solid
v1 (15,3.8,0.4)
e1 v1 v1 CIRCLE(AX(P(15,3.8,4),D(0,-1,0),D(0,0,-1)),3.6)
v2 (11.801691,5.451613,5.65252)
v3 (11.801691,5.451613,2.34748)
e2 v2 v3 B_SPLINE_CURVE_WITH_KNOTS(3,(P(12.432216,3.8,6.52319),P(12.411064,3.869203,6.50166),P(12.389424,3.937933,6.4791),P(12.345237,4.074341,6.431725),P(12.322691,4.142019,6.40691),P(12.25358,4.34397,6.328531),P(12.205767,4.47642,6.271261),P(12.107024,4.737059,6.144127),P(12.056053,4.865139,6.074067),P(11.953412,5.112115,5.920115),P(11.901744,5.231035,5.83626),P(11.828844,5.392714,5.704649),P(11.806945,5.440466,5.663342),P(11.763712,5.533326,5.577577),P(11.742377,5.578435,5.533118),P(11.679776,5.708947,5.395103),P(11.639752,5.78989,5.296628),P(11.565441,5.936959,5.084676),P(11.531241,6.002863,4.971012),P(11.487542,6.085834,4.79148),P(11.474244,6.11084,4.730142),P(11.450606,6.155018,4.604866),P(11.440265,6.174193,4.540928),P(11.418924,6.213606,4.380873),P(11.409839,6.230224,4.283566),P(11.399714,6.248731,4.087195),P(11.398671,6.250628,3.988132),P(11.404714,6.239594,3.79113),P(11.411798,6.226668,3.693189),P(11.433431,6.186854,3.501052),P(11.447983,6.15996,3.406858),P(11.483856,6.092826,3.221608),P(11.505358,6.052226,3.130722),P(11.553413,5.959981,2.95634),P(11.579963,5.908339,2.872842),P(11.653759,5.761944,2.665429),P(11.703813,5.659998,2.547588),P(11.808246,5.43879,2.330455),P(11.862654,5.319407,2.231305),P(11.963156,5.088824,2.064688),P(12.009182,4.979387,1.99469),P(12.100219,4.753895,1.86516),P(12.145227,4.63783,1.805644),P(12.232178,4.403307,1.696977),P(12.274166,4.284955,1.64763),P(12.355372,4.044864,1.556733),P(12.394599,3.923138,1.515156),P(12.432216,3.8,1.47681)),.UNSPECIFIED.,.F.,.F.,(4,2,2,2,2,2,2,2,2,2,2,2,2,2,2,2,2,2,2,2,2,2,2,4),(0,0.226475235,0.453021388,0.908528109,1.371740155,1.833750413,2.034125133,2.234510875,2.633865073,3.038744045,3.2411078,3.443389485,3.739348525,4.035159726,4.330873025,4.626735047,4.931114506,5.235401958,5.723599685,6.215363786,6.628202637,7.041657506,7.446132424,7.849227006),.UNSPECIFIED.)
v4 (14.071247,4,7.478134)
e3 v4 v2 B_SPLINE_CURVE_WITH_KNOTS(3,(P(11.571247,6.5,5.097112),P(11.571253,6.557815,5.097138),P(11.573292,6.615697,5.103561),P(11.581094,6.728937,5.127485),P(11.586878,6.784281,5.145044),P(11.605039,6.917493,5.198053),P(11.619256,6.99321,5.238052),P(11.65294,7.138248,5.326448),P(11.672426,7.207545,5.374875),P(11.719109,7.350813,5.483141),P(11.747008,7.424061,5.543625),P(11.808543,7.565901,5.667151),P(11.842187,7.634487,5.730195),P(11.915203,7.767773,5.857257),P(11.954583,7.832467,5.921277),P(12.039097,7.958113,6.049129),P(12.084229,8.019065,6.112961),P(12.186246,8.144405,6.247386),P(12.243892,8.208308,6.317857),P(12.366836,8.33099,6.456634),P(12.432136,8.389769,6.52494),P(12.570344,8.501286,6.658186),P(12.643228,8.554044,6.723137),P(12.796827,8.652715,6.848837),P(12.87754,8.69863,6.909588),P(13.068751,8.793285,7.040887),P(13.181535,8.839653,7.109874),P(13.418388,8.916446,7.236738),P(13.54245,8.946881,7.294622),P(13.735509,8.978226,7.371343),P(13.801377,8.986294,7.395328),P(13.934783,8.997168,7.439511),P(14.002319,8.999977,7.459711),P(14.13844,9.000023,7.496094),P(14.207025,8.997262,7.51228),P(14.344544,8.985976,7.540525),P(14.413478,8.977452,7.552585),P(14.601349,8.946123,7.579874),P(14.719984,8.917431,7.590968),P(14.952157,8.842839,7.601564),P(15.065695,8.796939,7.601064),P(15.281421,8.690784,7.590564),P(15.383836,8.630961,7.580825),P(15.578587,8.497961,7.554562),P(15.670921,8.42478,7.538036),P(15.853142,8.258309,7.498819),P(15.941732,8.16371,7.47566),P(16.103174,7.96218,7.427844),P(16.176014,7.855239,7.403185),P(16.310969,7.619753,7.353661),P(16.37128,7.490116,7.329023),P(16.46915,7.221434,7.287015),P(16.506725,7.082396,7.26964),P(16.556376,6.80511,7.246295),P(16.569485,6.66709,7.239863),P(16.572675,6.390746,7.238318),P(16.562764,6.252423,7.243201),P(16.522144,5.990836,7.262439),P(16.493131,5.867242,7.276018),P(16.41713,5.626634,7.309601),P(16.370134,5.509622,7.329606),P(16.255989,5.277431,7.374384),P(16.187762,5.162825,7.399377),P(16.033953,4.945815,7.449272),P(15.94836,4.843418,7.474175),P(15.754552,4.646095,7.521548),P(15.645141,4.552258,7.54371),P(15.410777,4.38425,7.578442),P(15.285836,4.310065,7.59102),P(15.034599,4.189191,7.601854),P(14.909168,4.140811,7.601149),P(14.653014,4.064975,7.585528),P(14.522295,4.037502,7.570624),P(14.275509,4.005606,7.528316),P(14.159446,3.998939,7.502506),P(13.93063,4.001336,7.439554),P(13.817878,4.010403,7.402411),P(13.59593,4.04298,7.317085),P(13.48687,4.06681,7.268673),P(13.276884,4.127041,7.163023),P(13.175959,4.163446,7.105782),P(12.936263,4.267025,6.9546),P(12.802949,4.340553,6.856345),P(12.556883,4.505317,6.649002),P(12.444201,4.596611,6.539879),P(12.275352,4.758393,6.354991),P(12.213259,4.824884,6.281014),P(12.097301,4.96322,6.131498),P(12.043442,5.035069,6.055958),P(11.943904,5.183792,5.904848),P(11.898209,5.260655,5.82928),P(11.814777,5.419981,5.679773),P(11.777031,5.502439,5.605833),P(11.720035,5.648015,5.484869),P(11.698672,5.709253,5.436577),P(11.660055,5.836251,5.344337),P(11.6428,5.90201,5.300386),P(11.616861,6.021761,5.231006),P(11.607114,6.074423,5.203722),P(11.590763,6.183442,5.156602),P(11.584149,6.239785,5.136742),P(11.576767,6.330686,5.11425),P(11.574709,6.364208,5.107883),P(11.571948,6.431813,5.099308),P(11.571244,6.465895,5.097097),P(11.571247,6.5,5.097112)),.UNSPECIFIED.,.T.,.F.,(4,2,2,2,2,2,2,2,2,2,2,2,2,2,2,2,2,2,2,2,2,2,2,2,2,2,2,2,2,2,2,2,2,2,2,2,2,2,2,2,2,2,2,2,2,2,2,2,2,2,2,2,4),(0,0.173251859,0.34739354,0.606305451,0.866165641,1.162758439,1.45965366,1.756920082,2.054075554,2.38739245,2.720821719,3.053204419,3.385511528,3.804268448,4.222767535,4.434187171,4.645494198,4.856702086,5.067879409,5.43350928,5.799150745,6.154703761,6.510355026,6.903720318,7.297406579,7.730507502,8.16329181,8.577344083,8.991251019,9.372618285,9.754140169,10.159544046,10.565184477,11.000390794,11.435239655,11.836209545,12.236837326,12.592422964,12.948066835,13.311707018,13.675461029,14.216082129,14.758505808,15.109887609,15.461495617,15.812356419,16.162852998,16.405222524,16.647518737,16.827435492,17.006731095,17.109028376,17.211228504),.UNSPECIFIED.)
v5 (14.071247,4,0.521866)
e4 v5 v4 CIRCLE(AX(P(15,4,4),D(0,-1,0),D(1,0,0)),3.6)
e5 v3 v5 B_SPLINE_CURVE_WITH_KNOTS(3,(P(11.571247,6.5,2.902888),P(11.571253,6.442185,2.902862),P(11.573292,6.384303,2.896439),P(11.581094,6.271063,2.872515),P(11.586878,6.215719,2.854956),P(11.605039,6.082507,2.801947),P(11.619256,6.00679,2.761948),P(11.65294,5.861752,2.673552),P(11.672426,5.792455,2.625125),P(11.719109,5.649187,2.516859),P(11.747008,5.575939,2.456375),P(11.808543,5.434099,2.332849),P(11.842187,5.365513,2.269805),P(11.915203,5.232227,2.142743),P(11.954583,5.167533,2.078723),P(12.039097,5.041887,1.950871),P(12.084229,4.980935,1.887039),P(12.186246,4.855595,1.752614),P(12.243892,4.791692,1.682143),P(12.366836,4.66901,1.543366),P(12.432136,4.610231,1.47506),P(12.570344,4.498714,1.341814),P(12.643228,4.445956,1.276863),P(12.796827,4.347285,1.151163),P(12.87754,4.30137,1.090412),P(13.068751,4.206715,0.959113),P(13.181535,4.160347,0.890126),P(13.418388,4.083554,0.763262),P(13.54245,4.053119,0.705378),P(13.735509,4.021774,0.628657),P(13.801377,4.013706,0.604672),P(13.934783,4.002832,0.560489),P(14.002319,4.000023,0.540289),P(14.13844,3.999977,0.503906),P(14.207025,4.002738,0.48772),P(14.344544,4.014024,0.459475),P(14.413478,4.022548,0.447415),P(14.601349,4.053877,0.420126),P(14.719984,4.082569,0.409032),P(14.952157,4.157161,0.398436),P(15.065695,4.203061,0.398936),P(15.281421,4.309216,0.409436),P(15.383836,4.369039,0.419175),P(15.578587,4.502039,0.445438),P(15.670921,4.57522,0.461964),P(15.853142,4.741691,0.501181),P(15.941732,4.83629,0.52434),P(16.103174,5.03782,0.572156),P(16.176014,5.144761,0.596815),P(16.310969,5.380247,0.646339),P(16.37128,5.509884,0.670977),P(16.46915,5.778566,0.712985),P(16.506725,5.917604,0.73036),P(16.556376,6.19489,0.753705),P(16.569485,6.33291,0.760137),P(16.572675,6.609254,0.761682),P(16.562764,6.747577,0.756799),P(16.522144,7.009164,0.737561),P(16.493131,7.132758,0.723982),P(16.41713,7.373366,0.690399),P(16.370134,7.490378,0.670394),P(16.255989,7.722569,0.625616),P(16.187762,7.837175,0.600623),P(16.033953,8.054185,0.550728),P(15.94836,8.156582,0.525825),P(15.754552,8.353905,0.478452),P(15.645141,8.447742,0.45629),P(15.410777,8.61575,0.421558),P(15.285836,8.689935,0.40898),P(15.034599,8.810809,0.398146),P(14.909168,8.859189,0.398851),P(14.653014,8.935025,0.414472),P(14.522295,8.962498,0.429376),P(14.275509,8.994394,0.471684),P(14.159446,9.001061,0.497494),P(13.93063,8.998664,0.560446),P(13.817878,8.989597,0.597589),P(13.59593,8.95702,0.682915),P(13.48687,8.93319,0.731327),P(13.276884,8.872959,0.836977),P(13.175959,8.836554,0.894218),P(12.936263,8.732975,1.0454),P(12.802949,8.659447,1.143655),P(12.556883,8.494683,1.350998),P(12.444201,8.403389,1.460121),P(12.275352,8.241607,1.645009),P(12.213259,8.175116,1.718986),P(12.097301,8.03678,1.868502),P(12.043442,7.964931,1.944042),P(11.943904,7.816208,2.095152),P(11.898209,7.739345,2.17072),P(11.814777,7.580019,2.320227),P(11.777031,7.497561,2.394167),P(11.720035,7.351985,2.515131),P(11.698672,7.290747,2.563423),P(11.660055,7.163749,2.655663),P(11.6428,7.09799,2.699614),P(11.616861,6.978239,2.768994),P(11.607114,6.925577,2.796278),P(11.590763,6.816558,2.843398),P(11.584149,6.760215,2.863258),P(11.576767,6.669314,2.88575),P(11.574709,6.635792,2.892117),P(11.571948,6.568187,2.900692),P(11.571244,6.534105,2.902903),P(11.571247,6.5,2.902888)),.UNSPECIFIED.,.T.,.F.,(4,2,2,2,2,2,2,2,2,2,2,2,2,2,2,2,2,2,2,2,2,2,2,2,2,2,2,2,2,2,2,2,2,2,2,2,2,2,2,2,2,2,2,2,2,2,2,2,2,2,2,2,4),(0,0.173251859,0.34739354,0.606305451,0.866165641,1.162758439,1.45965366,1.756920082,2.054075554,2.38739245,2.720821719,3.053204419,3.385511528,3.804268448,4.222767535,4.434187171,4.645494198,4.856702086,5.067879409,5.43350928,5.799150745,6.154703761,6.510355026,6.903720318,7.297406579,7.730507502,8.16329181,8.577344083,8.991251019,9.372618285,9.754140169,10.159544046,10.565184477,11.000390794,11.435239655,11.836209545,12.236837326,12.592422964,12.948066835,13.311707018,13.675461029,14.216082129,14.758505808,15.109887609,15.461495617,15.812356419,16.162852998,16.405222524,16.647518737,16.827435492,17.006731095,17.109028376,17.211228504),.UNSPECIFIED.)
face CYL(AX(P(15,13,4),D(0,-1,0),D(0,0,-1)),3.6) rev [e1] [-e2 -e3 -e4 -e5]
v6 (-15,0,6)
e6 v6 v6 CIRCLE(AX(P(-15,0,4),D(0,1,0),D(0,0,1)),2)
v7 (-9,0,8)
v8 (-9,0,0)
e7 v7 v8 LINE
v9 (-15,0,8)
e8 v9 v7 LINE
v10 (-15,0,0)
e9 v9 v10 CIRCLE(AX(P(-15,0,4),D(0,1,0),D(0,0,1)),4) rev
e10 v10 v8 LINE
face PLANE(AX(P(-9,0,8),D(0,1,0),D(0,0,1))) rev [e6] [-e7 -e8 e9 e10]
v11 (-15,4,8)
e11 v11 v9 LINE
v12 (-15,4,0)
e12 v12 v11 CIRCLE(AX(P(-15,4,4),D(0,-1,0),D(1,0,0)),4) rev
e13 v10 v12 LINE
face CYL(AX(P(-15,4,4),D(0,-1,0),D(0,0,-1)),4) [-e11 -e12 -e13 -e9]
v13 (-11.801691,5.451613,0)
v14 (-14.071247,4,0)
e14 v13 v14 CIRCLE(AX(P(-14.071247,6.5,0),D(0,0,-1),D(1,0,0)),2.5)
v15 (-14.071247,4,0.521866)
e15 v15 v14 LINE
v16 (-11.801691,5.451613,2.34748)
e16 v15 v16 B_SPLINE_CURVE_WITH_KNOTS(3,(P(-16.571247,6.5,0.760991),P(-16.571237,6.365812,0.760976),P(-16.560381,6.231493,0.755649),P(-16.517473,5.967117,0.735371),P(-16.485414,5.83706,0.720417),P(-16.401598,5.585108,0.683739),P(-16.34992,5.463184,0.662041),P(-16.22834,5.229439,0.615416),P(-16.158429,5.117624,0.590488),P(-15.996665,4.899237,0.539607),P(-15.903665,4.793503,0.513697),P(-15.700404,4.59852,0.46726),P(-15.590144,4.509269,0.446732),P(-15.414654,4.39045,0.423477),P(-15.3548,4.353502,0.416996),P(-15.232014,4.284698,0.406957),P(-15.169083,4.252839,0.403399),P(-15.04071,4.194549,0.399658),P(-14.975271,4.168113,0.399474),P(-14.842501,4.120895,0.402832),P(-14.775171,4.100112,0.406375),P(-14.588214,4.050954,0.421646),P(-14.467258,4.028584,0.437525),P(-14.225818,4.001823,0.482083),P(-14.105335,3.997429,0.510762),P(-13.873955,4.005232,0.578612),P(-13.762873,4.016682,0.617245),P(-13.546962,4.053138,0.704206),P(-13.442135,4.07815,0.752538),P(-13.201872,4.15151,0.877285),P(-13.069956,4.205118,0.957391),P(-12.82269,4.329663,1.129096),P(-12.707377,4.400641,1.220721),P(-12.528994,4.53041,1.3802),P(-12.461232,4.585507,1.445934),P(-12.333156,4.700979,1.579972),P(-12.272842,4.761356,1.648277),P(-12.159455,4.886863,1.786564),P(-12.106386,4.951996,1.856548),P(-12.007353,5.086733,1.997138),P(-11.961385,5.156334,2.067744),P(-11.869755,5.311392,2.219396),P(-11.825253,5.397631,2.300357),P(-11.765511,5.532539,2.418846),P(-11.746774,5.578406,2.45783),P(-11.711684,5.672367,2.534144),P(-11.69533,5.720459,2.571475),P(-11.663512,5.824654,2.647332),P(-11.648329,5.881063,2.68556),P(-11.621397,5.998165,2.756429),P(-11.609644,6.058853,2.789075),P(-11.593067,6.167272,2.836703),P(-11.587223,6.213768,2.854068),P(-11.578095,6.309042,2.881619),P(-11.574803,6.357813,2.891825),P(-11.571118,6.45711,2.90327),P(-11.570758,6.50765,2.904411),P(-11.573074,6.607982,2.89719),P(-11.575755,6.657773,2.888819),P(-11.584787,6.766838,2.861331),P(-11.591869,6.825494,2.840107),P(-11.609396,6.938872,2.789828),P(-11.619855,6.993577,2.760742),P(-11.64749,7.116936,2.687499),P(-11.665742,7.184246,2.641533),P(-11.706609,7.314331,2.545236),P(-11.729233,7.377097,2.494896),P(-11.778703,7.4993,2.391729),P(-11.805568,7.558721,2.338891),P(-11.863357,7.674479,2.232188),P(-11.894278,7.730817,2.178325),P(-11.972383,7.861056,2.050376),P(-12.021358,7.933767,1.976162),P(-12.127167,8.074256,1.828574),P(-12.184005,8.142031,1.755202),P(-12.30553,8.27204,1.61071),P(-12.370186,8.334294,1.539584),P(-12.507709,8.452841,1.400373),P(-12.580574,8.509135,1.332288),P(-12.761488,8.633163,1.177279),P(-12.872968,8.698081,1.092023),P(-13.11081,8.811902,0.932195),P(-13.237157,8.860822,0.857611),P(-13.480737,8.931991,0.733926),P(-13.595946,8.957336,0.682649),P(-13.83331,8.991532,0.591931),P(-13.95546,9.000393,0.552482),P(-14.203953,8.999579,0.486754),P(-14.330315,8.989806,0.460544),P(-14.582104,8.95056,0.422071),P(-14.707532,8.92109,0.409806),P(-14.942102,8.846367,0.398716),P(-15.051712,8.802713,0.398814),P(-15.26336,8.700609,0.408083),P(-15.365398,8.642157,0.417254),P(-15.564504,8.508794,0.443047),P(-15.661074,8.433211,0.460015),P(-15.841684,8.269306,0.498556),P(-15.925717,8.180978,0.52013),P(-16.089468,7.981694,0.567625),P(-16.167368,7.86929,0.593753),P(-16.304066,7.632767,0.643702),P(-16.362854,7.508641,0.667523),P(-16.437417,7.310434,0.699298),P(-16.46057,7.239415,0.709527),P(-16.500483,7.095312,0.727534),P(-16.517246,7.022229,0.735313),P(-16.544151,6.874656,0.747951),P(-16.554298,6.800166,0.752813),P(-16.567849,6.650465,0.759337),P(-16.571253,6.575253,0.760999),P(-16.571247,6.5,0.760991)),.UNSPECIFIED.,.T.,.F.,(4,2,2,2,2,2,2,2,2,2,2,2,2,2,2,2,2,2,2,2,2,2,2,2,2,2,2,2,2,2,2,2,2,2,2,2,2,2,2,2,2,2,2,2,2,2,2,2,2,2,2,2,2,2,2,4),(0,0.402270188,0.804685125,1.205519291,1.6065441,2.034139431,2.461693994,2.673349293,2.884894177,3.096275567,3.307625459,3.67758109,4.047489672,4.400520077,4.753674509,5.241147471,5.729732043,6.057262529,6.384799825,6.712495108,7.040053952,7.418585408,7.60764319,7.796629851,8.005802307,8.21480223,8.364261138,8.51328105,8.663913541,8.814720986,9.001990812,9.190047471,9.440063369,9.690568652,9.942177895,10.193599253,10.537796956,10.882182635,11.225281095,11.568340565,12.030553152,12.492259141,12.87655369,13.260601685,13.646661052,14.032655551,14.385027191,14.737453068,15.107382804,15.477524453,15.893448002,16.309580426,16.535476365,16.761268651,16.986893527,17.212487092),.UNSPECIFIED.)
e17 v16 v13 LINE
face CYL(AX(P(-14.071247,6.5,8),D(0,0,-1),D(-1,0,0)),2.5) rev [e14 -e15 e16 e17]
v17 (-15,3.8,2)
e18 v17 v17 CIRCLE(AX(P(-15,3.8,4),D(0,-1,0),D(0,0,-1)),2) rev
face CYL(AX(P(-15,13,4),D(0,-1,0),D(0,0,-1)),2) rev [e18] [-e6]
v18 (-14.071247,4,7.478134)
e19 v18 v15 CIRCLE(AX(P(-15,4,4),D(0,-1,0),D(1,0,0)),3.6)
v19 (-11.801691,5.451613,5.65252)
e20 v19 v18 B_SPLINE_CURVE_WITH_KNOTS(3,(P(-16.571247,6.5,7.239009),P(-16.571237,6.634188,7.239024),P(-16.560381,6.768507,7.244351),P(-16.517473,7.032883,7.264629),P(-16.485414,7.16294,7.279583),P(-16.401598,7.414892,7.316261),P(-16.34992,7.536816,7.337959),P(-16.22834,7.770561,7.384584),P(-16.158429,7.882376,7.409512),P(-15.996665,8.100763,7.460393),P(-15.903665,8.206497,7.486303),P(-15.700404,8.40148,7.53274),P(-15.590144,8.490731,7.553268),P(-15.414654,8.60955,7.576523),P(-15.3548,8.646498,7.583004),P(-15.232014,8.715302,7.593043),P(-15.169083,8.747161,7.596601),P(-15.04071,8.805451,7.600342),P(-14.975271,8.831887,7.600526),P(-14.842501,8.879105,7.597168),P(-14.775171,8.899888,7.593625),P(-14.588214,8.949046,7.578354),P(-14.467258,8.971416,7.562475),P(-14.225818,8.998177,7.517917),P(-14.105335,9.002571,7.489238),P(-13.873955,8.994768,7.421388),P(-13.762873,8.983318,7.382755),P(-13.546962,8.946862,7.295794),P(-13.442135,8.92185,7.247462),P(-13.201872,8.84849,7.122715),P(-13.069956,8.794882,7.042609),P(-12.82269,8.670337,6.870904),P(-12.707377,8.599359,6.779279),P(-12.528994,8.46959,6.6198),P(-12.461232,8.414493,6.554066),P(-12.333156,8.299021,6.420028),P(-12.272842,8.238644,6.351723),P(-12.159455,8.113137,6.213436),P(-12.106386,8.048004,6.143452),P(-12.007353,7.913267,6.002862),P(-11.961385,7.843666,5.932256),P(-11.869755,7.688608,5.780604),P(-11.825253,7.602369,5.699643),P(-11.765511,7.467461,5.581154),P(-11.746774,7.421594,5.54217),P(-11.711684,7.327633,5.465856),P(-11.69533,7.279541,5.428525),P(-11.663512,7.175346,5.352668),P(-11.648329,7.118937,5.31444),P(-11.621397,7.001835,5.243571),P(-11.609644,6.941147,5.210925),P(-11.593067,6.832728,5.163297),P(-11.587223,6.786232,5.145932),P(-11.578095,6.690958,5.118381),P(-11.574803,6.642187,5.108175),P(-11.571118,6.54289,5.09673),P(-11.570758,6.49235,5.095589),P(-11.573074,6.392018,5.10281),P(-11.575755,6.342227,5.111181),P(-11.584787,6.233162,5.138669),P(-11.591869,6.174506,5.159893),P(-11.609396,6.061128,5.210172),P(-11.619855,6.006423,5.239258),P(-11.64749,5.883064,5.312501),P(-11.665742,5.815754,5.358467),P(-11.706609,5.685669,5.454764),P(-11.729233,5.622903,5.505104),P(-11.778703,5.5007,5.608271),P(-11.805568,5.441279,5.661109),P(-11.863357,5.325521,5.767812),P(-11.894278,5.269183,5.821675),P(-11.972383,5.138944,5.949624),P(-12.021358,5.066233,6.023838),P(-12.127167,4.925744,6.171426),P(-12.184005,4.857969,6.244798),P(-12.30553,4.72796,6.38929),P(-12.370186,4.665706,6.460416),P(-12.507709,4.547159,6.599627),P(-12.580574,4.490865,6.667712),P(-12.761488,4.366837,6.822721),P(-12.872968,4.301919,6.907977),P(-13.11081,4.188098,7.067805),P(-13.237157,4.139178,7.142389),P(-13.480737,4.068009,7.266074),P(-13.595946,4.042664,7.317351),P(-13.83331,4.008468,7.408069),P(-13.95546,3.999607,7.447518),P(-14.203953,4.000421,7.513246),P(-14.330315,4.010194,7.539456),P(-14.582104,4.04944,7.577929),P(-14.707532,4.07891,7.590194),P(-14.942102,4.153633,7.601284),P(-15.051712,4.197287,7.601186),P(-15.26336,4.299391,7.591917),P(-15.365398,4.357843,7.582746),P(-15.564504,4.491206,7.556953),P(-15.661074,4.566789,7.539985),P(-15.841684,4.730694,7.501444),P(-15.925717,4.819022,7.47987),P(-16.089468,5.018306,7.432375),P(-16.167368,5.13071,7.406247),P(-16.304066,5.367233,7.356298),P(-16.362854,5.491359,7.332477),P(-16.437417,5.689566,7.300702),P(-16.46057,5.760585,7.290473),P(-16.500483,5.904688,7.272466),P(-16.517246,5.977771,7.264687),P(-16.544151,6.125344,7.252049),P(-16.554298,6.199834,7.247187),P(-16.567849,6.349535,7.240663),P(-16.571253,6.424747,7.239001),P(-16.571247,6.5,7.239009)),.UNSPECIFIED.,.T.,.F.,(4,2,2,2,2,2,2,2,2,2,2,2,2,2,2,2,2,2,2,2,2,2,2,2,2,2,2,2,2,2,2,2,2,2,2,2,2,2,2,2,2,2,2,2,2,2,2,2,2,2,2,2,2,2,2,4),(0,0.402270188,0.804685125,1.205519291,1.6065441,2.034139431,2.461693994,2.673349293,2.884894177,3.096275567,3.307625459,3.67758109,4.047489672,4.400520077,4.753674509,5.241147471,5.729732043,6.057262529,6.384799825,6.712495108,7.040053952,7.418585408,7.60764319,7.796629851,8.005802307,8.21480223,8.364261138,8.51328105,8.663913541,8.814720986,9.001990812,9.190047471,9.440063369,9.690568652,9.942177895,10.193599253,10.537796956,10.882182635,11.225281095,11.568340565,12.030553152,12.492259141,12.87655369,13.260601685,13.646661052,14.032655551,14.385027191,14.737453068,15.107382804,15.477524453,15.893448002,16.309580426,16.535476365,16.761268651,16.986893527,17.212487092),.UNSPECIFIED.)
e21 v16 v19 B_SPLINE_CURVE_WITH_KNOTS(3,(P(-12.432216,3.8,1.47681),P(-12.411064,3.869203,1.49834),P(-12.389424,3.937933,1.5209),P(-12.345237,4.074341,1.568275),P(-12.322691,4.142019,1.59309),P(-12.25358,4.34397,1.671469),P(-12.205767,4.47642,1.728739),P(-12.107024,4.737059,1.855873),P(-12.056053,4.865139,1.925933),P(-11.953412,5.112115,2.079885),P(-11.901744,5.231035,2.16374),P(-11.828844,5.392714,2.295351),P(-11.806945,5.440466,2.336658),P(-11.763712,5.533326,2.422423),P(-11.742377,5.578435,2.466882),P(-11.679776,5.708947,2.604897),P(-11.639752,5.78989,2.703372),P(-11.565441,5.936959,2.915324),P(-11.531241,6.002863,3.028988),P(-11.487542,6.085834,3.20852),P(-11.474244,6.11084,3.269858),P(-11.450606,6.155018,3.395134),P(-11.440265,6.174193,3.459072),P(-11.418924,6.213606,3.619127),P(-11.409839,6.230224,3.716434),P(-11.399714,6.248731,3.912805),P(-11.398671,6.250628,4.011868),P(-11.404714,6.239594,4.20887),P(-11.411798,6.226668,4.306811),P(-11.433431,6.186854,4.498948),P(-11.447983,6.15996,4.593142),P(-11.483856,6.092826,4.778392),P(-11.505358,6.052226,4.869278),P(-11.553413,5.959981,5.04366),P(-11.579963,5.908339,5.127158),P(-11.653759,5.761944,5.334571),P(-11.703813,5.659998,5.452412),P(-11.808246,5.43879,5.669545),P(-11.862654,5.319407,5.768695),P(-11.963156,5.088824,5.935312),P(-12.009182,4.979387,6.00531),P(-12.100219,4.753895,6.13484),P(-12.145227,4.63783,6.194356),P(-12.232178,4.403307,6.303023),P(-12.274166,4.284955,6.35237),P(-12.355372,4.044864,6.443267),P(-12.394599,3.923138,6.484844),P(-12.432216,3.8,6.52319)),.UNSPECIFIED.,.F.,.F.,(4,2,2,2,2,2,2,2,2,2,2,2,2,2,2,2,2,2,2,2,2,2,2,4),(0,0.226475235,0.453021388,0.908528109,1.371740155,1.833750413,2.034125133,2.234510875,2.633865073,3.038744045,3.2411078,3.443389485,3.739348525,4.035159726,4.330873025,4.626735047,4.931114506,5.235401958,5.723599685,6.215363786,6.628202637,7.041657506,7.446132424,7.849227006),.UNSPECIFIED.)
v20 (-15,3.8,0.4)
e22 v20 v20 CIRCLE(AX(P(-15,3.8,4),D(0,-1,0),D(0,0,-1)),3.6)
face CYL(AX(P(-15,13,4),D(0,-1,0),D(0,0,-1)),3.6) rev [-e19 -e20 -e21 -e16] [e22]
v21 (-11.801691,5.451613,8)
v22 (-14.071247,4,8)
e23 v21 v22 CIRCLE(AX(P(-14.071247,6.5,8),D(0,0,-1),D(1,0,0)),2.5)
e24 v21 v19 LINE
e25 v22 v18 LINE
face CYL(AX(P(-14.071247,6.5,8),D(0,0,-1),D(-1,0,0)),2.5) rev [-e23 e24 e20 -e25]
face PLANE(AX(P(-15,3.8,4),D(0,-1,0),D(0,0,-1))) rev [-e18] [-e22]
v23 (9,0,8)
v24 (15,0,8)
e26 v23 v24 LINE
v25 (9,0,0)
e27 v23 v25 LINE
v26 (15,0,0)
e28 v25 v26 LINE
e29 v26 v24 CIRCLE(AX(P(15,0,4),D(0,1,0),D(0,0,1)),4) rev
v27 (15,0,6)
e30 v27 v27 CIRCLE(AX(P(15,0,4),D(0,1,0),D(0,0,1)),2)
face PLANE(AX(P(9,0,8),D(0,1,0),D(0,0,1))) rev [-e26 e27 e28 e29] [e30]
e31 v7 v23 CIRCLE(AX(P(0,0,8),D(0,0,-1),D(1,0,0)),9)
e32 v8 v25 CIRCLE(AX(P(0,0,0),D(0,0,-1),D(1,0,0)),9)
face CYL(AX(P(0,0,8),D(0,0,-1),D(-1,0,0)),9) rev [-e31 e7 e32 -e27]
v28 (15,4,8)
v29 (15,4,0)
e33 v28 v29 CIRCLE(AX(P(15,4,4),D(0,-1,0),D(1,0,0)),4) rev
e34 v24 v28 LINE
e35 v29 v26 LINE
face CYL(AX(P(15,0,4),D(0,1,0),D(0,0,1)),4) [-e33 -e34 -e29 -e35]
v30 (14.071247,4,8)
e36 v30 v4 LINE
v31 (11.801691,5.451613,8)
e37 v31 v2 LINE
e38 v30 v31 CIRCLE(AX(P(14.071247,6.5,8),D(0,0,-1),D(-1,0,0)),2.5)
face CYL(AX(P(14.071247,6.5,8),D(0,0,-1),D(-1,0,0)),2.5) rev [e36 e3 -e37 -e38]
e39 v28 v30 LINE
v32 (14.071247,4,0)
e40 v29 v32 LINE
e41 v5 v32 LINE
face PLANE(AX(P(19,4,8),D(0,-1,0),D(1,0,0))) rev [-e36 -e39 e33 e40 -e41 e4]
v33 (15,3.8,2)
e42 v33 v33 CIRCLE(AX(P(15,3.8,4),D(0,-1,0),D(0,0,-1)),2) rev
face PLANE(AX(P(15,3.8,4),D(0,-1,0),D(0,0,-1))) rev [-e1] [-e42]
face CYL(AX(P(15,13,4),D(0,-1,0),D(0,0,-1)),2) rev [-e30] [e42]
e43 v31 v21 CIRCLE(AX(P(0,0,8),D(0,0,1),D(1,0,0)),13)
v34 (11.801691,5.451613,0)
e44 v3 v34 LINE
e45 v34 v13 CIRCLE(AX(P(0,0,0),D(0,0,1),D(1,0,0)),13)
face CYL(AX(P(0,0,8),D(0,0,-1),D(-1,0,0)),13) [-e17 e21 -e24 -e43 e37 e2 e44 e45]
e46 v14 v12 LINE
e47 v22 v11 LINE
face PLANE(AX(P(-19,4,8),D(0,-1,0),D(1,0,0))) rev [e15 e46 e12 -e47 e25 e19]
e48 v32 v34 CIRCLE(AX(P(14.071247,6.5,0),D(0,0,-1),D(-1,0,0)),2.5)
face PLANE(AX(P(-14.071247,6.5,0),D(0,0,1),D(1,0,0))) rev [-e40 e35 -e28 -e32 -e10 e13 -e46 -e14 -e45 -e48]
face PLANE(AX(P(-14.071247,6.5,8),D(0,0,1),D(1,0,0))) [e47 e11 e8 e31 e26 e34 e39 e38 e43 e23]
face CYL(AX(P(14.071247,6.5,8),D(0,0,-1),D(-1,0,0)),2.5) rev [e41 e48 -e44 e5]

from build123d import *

# Parameters (mm, degrees)
BOSS_EXTRUDE1_DEPTH      = 8
CUT_EXTRUDE1_DEPTH       = 25.372115214
CUT_EXTRUDE1_DEPTH_BACK  = 25.372115214
SKETCH3_R                = 2
FILLET1_RADIUS           = 4
FILLET1_LENGTH           = 4
FILLET2_RADIUS           = 4
FILLET2_LENGTH           = 4
CUT_EXTRUDE2_START       = -7
CUT_EXTRUDE2_OUTLINE_R   = 3.6
CUT_EXTRUDE2_OUTLINE_R_2 = 2
CUT_EXTRUDE2_DEPTH       = 3.2


with BuildPart() as part:
    # Sketch2 → Boss-Extrude1 (new body)
    with BuildSketch(Plane.XY):
        with BuildLine():
            Line((9, 0), (19, 0))
            Line((19, 0), (19, 4))
            Line((19, 4), (14.071247279, 4))
            ThreePointArc((14.071247279, 4), (12.724207514, 4.393941152), (11.801691267, 5.451612903))
            ThreePointArc((11.801691267, 5.451612903), (0, 13), (-11.801691267, 5.451612903))
            ThreePointArc((-11.801691267, 5.451612903), (-12.724207514, 4.393941152), (-14.071247279, 4))
            Line((-14.071247279, 4), (-19, 4))
            Line((-19, 4), (-19, 0))
            Line((-19, 0), (-9, 0))
            ThreePointArc((-9, 0), (0, 9), (9, 0))
        make_face()
    extrude(amount=BOSS_EXTRUDE1_DEPTH)

    # Sketch3 → Cut-Extrude1 (cut, two sides: drawn at the far end of the back side and taken through both)
    with BuildSketch(Plane.XZ.offset(-CUT_EXTRUDE1_DEPTH_BACK)):
        with Locations(Location((15, 4, 0), (0, 0, 242.330131357))):
            Circle(SKETCH3_R)
        with Locations(Location((-15, 4, 0), (0, 0, 297.669868622))):
            Circle(SKETCH3_R)
    extrude(amount=CUT_EXTRUDE1_DEPTH + CUT_EXTRUDE1_DEPTH_BACK, mode=Mode.SUBTRACT)

    # Fillet1: full round fillet: the end face becomes a half cylinder, R = half its width
    fillet1_face = Plane((-19, 2, 4), x_dir=(0, 1, 0), z_dir=(-1, 0, 0))  # on the end face: x along it, z out of the body
    fillet1_slab = fillet1_face.offset(-FILLET1_RADIUS / 2) * Box(FILLET1_LENGTH, 2 * FILLET1_RADIUS, FILLET1_RADIUS, mode=Mode.PRIVATE)  # the body's end, R deep
    fillet1_round = Plane((-15, 2, 4), x_dir=(-1, 0, 0), z_dir=(0, 1, 0)) * Cylinder(FILLET1_RADIUS, FILLET1_LENGTH, mode=Mode.PRIVATE)  # its axis R under the face
    add(fillet1_slab - fillet1_round, mode=Mode.SUBTRACT)

    # Fillet2: full round fillet: the end face becomes a half cylinder, R = half its width
    fillet2_face = Plane((19, 2, 4), x_dir=(0, 1, 0), z_dir=(1, 0, 0))  # on the end face: x along it, z out of the body
    fillet2_slab = fillet2_face.offset(-FILLET2_RADIUS / 2) * Box(FILLET2_LENGTH, 2 * FILLET2_RADIUS, FILLET2_RADIUS, mode=Mode.PRIVATE)  # the body's end, R deep
    fillet2_round = Plane((15, 2, 4), x_dir=(1, 0, 0), z_dir=(0, 1, 0)) * Cylinder(FILLET2_RADIUS, FILLET2_LENGTH, mode=Mode.PRIVATE)  # its axis R under the face
    add(fillet2_slab - fillet2_round, mode=Mode.SUBTRACT)

    # Cut-Extrude2: read off the stored shape, not the designer's step
    # Cut-Extrude2 outline → Cut-Extrude2 (cut)
    # profile 1 of 2: a face of its own
    with BuildSketch(Plane.XZ.offset(CUT_EXTRUDE2_START)):
        with Locations((-15, 4)):
            Circle(CUT_EXTRUDE2_OUTLINE_R)
        with Locations((-15, 4)):
            Circle(CUT_EXTRUDE2_OUTLINE_R_2, mode=Mode.SUBTRACT)
    # profile 2 of 2: a face of its own
    with BuildSketch(Plane.XZ.offset(CUT_EXTRUDE2_START)):
        with Locations((15, 4)):
            Circle(CUT_EXTRUDE2_OUTLINE_R)
        with Locations((15, 4)):
            Circle(CUT_EXTRUDE2_OUTLINE_R_2, mode=Mode.SUBTRACT)
    extrude(amount=CUT_EXTRUDE2_DEPTH, mode=Mode.SUBTRACT)


solid = part.part
